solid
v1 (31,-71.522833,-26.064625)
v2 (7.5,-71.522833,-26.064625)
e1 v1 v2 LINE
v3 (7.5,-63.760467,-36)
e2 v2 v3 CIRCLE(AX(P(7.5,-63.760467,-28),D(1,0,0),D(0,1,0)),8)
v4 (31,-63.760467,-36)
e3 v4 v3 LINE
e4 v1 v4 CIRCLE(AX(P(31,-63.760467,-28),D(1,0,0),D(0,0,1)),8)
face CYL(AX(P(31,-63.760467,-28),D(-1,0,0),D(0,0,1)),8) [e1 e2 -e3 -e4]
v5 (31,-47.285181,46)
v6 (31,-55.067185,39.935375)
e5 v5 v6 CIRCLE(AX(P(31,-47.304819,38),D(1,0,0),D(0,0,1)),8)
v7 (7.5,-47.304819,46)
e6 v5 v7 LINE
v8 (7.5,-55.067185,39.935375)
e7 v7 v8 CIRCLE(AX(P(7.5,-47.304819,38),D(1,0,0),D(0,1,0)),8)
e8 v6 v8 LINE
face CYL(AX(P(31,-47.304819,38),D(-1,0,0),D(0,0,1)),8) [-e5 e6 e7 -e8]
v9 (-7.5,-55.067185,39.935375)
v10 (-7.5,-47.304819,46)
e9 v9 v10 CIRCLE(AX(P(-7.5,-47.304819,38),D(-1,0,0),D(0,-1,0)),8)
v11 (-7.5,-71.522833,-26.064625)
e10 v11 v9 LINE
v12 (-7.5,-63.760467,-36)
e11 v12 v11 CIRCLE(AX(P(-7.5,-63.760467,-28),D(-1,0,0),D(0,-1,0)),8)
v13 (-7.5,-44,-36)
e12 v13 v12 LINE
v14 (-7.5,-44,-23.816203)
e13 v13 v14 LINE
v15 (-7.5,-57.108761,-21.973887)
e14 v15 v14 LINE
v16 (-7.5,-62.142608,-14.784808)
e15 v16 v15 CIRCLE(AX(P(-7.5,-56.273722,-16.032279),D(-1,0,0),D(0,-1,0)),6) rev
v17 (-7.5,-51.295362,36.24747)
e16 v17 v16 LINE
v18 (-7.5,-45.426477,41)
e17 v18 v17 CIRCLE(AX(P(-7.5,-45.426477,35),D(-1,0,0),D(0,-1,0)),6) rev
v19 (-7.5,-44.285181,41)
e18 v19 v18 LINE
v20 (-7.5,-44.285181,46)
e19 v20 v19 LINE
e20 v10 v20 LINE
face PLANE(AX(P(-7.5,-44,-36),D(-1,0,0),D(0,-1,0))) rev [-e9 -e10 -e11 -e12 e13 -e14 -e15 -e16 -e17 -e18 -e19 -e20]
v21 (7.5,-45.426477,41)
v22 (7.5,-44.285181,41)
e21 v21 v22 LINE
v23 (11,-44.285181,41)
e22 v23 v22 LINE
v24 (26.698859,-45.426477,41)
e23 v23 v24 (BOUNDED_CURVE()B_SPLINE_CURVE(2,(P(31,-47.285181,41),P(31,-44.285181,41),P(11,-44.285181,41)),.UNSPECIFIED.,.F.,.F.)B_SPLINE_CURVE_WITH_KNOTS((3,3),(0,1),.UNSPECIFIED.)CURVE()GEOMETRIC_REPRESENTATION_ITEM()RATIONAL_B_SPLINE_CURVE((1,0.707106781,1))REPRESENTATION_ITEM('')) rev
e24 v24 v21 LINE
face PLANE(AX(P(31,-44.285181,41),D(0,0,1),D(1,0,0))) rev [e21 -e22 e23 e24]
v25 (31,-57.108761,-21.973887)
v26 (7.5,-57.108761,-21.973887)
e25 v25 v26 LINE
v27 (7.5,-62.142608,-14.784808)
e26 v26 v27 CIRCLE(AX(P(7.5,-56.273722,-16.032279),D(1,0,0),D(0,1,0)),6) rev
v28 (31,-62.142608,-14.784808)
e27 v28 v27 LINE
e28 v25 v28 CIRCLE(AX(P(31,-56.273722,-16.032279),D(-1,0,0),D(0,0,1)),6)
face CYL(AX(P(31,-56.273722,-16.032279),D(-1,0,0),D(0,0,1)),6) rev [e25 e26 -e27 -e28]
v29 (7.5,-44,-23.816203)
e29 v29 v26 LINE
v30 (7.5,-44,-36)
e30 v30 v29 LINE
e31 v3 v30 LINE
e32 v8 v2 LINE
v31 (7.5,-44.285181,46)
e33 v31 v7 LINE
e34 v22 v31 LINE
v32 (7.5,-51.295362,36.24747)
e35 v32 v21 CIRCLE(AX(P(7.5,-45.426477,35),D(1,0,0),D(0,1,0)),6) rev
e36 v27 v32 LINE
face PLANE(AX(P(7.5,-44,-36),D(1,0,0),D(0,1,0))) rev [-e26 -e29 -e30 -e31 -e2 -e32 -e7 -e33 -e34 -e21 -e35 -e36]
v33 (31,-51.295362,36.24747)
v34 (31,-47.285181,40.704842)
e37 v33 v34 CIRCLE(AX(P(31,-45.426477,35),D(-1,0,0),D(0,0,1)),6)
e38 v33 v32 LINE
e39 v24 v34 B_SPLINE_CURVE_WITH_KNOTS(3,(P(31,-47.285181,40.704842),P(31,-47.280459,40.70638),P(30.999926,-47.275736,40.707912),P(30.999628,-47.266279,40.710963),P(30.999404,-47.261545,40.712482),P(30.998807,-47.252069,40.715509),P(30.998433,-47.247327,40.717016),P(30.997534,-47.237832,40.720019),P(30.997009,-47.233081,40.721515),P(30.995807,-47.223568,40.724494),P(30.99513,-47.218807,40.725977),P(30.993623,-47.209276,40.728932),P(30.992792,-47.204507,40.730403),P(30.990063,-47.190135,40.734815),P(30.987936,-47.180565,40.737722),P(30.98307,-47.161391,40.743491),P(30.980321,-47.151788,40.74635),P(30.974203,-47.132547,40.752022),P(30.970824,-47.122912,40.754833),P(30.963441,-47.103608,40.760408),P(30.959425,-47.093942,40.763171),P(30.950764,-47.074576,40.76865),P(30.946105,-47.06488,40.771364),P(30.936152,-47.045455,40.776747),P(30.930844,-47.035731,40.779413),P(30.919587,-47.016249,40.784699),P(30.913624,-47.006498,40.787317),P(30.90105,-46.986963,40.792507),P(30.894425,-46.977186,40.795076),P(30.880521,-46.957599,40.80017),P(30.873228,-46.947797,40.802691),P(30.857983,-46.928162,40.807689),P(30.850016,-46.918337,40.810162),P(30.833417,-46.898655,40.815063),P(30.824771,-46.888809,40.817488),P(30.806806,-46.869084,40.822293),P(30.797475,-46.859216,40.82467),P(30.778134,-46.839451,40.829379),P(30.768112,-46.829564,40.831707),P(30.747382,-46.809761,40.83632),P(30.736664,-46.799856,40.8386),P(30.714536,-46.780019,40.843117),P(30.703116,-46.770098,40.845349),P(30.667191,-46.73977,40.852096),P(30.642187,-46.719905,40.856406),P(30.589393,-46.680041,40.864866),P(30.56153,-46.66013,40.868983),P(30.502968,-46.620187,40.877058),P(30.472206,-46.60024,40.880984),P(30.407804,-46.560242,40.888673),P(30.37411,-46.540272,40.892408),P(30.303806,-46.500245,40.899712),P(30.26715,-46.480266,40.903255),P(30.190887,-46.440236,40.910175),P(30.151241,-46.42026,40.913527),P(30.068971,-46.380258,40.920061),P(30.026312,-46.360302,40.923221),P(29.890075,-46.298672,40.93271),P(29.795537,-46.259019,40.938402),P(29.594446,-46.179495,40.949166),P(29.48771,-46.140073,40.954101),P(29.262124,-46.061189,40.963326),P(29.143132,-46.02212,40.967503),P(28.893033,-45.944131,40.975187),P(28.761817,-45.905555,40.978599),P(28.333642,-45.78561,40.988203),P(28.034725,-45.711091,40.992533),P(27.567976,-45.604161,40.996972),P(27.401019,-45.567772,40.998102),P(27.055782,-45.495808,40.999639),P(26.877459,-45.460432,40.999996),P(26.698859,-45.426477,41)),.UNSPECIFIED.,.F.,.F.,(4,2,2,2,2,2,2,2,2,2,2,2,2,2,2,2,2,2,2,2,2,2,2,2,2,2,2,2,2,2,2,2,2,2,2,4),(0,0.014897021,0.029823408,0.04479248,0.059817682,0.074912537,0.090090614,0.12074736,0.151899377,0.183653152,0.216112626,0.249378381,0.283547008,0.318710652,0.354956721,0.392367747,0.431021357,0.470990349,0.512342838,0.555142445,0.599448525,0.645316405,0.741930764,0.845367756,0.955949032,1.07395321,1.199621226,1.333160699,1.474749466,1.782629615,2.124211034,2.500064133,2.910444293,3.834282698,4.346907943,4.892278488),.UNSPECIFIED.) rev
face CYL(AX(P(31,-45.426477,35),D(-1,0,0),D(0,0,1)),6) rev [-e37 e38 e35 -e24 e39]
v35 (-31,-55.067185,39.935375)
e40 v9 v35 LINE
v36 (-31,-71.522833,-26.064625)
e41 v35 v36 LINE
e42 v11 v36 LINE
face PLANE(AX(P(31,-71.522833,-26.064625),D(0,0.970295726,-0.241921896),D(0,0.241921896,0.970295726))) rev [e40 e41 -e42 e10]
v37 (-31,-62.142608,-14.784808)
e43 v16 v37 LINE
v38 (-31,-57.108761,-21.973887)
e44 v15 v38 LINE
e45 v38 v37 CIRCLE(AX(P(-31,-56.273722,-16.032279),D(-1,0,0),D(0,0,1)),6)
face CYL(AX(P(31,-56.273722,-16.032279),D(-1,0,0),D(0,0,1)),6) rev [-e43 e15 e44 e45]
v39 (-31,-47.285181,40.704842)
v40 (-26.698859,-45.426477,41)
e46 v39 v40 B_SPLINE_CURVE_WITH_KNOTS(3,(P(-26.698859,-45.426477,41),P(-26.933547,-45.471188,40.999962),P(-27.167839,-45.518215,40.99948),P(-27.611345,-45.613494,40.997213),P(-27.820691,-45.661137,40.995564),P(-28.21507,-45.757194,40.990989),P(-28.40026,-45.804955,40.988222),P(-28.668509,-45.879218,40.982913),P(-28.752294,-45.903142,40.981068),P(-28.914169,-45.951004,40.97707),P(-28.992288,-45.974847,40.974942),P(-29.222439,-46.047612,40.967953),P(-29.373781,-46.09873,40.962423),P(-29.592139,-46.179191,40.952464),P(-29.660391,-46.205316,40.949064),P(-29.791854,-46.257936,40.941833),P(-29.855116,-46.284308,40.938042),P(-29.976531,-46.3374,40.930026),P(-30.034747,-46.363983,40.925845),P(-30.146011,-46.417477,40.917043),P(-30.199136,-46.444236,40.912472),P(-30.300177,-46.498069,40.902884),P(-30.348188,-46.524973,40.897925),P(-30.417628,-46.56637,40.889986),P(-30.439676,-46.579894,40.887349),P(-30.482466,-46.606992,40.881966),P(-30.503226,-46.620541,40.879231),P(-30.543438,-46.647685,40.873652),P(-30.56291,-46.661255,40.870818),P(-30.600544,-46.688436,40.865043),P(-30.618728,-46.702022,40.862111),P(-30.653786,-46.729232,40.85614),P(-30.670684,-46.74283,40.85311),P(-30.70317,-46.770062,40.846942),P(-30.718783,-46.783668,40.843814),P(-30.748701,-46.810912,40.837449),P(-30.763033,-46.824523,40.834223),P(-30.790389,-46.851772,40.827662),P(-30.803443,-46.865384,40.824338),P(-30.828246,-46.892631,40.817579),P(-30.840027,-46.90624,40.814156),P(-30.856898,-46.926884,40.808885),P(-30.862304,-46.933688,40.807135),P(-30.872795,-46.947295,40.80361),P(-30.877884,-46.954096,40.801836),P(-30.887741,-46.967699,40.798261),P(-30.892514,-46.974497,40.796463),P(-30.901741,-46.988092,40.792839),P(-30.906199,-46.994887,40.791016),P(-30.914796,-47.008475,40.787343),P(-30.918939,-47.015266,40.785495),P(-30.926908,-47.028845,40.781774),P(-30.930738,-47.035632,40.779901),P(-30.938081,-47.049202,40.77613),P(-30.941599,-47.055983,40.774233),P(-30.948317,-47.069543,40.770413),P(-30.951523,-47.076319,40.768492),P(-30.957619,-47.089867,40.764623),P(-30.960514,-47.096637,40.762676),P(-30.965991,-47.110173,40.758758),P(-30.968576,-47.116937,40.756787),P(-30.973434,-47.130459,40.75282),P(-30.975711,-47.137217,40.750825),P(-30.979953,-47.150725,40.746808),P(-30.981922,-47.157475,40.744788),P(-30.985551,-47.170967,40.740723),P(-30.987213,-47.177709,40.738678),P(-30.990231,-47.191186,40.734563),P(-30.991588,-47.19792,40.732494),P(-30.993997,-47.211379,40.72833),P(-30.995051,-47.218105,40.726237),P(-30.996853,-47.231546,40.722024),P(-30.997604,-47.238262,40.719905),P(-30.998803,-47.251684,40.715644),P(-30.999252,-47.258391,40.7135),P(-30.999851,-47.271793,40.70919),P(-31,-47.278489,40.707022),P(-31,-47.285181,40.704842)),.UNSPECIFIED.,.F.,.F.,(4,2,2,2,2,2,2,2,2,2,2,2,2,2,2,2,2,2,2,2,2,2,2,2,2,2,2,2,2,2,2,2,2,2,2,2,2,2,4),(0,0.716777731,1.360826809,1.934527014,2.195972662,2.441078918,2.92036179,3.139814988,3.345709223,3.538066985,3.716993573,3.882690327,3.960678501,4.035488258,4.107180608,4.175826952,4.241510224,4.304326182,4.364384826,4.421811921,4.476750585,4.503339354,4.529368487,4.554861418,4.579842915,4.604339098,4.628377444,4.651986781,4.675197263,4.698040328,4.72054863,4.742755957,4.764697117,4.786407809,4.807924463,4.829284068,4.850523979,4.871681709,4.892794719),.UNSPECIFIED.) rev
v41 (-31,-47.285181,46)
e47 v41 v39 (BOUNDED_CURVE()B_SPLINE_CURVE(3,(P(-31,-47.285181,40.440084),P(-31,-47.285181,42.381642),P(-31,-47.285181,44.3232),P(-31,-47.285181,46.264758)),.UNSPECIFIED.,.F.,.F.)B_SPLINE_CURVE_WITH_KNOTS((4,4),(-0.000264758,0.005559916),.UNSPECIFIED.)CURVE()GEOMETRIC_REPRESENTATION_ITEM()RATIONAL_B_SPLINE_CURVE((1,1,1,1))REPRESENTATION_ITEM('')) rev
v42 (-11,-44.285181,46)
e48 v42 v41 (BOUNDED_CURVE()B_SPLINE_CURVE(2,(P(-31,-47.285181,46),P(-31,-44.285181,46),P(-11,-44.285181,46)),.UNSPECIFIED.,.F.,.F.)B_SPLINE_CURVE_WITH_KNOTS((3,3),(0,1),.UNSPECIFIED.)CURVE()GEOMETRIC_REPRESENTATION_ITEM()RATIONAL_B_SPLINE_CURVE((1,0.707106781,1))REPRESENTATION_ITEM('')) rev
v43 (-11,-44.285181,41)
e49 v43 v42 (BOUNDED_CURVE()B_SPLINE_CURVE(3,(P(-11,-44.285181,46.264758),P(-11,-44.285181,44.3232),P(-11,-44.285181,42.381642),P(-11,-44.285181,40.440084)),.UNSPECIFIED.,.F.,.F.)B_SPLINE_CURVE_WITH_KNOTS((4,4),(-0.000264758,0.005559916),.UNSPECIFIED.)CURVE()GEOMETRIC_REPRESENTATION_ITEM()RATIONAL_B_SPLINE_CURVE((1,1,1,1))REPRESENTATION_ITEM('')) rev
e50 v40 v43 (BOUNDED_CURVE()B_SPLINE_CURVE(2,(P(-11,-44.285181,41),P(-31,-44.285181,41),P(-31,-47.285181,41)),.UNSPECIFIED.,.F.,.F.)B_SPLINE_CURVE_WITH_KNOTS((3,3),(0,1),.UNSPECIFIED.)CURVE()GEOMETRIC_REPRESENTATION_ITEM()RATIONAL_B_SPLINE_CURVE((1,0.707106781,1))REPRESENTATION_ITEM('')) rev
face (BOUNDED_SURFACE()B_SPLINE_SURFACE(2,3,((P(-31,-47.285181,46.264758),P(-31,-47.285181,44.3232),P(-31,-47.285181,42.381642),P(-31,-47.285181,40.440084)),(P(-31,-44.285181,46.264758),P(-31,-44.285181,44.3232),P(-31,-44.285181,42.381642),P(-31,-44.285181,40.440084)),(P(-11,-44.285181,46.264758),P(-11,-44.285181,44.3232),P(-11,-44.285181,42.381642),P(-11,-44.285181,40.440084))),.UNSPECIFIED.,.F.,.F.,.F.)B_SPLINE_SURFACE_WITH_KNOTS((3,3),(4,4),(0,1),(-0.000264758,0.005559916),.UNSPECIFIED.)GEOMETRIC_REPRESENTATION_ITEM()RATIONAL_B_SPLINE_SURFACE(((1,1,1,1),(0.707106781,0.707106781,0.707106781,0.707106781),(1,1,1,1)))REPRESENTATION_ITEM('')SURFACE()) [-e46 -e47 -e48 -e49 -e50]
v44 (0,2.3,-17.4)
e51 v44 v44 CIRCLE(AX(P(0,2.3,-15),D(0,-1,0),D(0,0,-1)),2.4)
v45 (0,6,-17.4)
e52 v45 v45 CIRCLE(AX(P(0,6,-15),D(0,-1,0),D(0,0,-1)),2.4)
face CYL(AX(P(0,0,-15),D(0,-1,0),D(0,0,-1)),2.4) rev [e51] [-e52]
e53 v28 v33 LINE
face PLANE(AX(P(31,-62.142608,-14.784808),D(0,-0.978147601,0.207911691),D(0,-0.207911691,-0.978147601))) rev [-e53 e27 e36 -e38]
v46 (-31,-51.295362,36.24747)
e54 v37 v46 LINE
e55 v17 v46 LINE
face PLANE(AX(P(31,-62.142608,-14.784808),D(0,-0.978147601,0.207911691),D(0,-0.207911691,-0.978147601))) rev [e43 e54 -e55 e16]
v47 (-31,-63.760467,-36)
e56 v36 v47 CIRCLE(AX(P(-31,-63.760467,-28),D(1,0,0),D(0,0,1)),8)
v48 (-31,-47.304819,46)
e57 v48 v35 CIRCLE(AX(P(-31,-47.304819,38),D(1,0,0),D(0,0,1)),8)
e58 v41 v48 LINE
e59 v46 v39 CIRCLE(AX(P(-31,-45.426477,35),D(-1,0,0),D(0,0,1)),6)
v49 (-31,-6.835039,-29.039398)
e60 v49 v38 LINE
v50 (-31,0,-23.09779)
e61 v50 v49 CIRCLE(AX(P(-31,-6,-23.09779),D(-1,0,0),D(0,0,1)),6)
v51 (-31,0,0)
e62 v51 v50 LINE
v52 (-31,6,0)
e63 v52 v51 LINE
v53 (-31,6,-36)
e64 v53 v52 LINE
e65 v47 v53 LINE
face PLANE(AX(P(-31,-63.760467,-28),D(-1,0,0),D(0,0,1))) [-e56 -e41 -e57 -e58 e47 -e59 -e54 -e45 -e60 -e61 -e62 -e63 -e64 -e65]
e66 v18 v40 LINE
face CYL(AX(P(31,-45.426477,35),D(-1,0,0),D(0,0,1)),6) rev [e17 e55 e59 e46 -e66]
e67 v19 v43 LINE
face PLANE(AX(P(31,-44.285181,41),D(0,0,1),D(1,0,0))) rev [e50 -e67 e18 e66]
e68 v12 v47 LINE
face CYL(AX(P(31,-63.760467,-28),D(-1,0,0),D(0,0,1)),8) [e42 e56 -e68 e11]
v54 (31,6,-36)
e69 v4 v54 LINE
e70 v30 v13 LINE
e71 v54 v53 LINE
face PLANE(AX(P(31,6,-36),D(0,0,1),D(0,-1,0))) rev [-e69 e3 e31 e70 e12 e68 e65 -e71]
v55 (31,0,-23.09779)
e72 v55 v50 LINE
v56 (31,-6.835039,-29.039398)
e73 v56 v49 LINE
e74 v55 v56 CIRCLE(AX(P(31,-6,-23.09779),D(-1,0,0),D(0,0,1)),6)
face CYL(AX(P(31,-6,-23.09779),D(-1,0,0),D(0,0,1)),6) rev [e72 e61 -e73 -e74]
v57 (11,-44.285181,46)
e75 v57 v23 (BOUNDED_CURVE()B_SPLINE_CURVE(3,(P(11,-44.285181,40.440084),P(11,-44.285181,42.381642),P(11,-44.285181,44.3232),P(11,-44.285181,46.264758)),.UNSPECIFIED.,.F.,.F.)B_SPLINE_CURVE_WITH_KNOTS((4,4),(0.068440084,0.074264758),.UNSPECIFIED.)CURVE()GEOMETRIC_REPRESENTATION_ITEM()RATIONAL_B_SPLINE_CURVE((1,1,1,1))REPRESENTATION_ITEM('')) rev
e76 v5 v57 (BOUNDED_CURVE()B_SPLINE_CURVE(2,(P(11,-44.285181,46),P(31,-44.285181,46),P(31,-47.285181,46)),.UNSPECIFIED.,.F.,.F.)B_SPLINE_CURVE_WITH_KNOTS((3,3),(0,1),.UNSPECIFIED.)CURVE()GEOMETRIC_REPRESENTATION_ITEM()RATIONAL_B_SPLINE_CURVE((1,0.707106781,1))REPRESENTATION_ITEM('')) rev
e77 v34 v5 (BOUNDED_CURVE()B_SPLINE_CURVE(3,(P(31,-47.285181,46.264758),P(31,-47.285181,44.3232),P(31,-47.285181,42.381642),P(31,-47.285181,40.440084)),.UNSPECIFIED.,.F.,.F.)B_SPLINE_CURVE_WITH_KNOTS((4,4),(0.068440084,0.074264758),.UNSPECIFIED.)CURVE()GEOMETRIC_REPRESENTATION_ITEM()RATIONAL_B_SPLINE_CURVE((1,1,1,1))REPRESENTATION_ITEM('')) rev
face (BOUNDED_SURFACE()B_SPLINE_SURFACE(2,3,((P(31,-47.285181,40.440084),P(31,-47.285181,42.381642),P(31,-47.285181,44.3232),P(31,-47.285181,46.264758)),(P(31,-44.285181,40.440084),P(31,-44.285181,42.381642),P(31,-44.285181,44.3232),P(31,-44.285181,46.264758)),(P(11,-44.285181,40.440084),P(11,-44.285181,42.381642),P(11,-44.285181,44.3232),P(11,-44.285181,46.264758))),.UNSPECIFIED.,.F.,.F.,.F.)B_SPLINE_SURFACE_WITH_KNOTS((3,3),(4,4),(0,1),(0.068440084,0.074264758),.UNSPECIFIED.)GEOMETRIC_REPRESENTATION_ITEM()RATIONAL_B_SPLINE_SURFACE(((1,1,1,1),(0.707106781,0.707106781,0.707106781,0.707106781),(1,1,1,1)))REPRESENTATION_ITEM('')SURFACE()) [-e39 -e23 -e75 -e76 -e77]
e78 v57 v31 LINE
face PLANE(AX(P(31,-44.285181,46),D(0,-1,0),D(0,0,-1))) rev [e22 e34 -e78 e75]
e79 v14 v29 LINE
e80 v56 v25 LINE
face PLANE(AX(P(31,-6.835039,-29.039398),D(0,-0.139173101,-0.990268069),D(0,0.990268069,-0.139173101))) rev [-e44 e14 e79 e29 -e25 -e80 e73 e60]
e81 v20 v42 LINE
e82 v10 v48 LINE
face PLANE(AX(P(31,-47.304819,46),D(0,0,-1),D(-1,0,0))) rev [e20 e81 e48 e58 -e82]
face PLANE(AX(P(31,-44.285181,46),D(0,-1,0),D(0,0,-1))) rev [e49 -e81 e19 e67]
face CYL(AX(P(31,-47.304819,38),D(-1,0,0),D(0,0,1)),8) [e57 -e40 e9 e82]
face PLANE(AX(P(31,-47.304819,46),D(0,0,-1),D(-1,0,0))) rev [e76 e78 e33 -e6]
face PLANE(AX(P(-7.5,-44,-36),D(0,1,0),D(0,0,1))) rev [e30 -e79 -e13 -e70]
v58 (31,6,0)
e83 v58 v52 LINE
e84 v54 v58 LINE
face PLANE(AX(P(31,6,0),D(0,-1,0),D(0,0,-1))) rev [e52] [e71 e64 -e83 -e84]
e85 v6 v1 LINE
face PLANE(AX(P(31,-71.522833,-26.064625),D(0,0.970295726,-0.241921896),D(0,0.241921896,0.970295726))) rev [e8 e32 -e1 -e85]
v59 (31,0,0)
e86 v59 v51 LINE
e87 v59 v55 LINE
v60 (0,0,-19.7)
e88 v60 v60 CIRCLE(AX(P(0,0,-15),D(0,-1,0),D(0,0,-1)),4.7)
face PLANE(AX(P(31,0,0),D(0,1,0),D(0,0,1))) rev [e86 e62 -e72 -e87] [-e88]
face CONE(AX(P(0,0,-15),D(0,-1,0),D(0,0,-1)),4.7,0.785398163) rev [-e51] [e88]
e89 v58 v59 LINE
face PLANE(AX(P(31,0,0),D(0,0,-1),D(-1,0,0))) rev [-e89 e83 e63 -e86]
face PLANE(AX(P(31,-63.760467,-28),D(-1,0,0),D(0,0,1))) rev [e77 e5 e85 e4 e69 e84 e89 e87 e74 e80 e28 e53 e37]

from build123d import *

# Parameters (mm, degrees)
BOSS_EXTRUDE1_DEPTH                                 = 31
FILLET1_SIZE                                        = 20
FILLET1_SIZE_2                                      = 3
FILLET2_SIZE                                        = 3
FILLET2_SIZE_2                                      = 20
CUT_EXTRUDE1_DEPTH                                  = 91.700411417
CUT_EXTRUDE1_DEPTH_BACK                             = 91.700411417
SKETCH2_W                                           = 15
SKETCH2_H                                           = 30
CSK_FOR_M4_COUNTERSUNK_FLAT_HEAD_SCREW1_D           = 4.8
CSK_FOR_M4_COUNTERSUNK_FLAT_HEAD_SCREW1_DEPTH       = 15.2
CSK_FOR_M4_COUNTERSUNK_FLAT_HEAD_SCREW1_CSINK_D     = 9.4
CSK_FOR_M4_COUNTERSUNK_FLAT_HEAD_SCREW1_CSINK_ANGLE = 90
CSK_FOR_M4_COUNTERSUNK_FLAT_HEAD_SCREW1_TIP         = 1.442065486


with BuildPart() as part:
    # Sketch1 → Boss-Extrude1 (new, symmetric)
    with BuildSketch(Plane(origin=(0, 0, 0), x_dir=(0, 0, -1), z_dir=(1, 0, 0))):
        with BuildLine():
            Line((0, 0), (23.097789557, 0))
            ThreePointArc((23.097789557, 0), (27.626047038, -2.063645826), (29.039397969, -6.835038606))
            Line((29.039397969, -6.835038606), (21.973887052, -57.10876106))
            ThreePointArc((21.973887052, -57.10876106), (19.473737257, -61.18863472), (14.784808494, -62.142608059))
            Line((14.784808494, -62.142608059), (-36.247470145, -51.295362377))
            ThreePointArc((-36.247470145, -51.295362377), (-39.662875769, -49.202399119), (-41, -45.426476772))
            Line((-41, -45.426476772), (-41, -44.285180972))
            Line((-41, -44.285180972), (-46, -44.285180972))
            Line((-46, -44.285180972), (-46, -47.304818755))
            ThreePointArc((-46, -47.304818755), (-44.304086029, -52.230110557), (-39.935375165, -55.067184565))
            Line((-39.935375165, -55.067184565), (26.064624835, -71.522832753))
            ThreePointArc((26.064624835, -71.522832753), (32.925291803, -70.064552971), (36, -63.760466942))
            Line((36, -63.760466942), (36, 6))
            Line((36, 6), (0, 6))
            Line((0, 6), (0, 0))
        make_face()
    extrude(amount=BOSS_EXTRUDE1_DEPTH, both=True)

    # Fillet1
    # an asymmetric fillet: 20, 3 mm, written as the material it takes off along each edge
    with BuildSketch(Plane(origin=(-31, -44.285180972, -9), x_dir=(1, 0, 0), z_dir=(0, 0, 1))) as fillet1_piece_1:
        with BuildLine():
            Bezier((FILLET1_SIZE, 0), (0, 0), (0, -FILLET1_SIZE_2), weights=[1, 0.707106781, 1])
            Line((0, -FILLET1_SIZE_2), (0, 0))
            Line((0, 0), (FILLET1_SIZE, 0))
        make_face()
    extrude(amount=105, mode=Mode.SUBTRACT)

    # Fillet2
    # an asymmetric fillet: 20, 3 mm, written as the material it takes off along each edge
    with BuildSketch(Plane(origin=(31, -44.285180972, -9), x_dir=(0, -1, 0), z_dir=(0, 0, 1))) as fillet2_piece_1:
        with BuildLine():
            Bezier((FILLET2_SIZE, 0), (0, 0), (0, -FILLET2_SIZE_2), weights=[1, 0.707106781, 1])
            Line((0, -FILLET2_SIZE_2), (0, 0))
            Line((0, 0), (FILLET2_SIZE, 0))
        make_face()
    extrude(amount=105, mode=Mode.SUBTRACT)

    # Sketch2 → Cut-Extrude1 (cut, two sides: drawn at the far end of the back side and taken through both)
    with BuildSketch(Plane.XY.offset(-CUT_EXTRUDE1_DEPTH_BACK)):
        with Locations((0, -59)):
            Rectangle(SKETCH2_W, SKETCH2_H)
    extrude(amount=CUT_EXTRUDE1_DEPTH + CUT_EXTRUDE1_DEPTH_BACK, mode=Mode.SUBTRACT)

    # CSK for M4 Countersunk Flat Head Screw1
    with Locations(Plane(origin=(0, 0, -15), x_dir=(0, 0, -1), z_dir=(0, -1, 0))):
        with Locations((0, 0)):
            CounterSinkHole(CSK_FOR_M4_COUNTERSUNK_FLAT_HEAD_SCREW1_D / 2, CSK_FOR_M4_COUNTERSUNK_FLAT_HEAD_SCREW1_CSINK_D / 2, depth=CSK_FOR_M4_COUNTERSUNK_FLAT_HEAD_SCREW1_DEPTH, counter_sink_angle=CSK_FOR_M4_COUNTERSUNK_FLAT_HEAD_SCREW1_CSINK_ANGLE)
            with Locations((0, 0, -(CSK_FOR_M4_COUNTERSUNK_FLAT_HEAD_SCREW1_DEPTH + CSK_FOR_M4_COUNTERSUNK_FLAT_HEAD_SCREW1_TIP / 2))):  # 118° drill point
                Cone(0, CSK_FOR_M4_COUNTERSUNK_FLAT_HEAD_SCREW1_D / 2, CSK_FOR_M4_COUNTERSUNK_FLAT_HEAD_SCREW1_TIP, mode=Mode.SUBTRACT)


solid = part.part
